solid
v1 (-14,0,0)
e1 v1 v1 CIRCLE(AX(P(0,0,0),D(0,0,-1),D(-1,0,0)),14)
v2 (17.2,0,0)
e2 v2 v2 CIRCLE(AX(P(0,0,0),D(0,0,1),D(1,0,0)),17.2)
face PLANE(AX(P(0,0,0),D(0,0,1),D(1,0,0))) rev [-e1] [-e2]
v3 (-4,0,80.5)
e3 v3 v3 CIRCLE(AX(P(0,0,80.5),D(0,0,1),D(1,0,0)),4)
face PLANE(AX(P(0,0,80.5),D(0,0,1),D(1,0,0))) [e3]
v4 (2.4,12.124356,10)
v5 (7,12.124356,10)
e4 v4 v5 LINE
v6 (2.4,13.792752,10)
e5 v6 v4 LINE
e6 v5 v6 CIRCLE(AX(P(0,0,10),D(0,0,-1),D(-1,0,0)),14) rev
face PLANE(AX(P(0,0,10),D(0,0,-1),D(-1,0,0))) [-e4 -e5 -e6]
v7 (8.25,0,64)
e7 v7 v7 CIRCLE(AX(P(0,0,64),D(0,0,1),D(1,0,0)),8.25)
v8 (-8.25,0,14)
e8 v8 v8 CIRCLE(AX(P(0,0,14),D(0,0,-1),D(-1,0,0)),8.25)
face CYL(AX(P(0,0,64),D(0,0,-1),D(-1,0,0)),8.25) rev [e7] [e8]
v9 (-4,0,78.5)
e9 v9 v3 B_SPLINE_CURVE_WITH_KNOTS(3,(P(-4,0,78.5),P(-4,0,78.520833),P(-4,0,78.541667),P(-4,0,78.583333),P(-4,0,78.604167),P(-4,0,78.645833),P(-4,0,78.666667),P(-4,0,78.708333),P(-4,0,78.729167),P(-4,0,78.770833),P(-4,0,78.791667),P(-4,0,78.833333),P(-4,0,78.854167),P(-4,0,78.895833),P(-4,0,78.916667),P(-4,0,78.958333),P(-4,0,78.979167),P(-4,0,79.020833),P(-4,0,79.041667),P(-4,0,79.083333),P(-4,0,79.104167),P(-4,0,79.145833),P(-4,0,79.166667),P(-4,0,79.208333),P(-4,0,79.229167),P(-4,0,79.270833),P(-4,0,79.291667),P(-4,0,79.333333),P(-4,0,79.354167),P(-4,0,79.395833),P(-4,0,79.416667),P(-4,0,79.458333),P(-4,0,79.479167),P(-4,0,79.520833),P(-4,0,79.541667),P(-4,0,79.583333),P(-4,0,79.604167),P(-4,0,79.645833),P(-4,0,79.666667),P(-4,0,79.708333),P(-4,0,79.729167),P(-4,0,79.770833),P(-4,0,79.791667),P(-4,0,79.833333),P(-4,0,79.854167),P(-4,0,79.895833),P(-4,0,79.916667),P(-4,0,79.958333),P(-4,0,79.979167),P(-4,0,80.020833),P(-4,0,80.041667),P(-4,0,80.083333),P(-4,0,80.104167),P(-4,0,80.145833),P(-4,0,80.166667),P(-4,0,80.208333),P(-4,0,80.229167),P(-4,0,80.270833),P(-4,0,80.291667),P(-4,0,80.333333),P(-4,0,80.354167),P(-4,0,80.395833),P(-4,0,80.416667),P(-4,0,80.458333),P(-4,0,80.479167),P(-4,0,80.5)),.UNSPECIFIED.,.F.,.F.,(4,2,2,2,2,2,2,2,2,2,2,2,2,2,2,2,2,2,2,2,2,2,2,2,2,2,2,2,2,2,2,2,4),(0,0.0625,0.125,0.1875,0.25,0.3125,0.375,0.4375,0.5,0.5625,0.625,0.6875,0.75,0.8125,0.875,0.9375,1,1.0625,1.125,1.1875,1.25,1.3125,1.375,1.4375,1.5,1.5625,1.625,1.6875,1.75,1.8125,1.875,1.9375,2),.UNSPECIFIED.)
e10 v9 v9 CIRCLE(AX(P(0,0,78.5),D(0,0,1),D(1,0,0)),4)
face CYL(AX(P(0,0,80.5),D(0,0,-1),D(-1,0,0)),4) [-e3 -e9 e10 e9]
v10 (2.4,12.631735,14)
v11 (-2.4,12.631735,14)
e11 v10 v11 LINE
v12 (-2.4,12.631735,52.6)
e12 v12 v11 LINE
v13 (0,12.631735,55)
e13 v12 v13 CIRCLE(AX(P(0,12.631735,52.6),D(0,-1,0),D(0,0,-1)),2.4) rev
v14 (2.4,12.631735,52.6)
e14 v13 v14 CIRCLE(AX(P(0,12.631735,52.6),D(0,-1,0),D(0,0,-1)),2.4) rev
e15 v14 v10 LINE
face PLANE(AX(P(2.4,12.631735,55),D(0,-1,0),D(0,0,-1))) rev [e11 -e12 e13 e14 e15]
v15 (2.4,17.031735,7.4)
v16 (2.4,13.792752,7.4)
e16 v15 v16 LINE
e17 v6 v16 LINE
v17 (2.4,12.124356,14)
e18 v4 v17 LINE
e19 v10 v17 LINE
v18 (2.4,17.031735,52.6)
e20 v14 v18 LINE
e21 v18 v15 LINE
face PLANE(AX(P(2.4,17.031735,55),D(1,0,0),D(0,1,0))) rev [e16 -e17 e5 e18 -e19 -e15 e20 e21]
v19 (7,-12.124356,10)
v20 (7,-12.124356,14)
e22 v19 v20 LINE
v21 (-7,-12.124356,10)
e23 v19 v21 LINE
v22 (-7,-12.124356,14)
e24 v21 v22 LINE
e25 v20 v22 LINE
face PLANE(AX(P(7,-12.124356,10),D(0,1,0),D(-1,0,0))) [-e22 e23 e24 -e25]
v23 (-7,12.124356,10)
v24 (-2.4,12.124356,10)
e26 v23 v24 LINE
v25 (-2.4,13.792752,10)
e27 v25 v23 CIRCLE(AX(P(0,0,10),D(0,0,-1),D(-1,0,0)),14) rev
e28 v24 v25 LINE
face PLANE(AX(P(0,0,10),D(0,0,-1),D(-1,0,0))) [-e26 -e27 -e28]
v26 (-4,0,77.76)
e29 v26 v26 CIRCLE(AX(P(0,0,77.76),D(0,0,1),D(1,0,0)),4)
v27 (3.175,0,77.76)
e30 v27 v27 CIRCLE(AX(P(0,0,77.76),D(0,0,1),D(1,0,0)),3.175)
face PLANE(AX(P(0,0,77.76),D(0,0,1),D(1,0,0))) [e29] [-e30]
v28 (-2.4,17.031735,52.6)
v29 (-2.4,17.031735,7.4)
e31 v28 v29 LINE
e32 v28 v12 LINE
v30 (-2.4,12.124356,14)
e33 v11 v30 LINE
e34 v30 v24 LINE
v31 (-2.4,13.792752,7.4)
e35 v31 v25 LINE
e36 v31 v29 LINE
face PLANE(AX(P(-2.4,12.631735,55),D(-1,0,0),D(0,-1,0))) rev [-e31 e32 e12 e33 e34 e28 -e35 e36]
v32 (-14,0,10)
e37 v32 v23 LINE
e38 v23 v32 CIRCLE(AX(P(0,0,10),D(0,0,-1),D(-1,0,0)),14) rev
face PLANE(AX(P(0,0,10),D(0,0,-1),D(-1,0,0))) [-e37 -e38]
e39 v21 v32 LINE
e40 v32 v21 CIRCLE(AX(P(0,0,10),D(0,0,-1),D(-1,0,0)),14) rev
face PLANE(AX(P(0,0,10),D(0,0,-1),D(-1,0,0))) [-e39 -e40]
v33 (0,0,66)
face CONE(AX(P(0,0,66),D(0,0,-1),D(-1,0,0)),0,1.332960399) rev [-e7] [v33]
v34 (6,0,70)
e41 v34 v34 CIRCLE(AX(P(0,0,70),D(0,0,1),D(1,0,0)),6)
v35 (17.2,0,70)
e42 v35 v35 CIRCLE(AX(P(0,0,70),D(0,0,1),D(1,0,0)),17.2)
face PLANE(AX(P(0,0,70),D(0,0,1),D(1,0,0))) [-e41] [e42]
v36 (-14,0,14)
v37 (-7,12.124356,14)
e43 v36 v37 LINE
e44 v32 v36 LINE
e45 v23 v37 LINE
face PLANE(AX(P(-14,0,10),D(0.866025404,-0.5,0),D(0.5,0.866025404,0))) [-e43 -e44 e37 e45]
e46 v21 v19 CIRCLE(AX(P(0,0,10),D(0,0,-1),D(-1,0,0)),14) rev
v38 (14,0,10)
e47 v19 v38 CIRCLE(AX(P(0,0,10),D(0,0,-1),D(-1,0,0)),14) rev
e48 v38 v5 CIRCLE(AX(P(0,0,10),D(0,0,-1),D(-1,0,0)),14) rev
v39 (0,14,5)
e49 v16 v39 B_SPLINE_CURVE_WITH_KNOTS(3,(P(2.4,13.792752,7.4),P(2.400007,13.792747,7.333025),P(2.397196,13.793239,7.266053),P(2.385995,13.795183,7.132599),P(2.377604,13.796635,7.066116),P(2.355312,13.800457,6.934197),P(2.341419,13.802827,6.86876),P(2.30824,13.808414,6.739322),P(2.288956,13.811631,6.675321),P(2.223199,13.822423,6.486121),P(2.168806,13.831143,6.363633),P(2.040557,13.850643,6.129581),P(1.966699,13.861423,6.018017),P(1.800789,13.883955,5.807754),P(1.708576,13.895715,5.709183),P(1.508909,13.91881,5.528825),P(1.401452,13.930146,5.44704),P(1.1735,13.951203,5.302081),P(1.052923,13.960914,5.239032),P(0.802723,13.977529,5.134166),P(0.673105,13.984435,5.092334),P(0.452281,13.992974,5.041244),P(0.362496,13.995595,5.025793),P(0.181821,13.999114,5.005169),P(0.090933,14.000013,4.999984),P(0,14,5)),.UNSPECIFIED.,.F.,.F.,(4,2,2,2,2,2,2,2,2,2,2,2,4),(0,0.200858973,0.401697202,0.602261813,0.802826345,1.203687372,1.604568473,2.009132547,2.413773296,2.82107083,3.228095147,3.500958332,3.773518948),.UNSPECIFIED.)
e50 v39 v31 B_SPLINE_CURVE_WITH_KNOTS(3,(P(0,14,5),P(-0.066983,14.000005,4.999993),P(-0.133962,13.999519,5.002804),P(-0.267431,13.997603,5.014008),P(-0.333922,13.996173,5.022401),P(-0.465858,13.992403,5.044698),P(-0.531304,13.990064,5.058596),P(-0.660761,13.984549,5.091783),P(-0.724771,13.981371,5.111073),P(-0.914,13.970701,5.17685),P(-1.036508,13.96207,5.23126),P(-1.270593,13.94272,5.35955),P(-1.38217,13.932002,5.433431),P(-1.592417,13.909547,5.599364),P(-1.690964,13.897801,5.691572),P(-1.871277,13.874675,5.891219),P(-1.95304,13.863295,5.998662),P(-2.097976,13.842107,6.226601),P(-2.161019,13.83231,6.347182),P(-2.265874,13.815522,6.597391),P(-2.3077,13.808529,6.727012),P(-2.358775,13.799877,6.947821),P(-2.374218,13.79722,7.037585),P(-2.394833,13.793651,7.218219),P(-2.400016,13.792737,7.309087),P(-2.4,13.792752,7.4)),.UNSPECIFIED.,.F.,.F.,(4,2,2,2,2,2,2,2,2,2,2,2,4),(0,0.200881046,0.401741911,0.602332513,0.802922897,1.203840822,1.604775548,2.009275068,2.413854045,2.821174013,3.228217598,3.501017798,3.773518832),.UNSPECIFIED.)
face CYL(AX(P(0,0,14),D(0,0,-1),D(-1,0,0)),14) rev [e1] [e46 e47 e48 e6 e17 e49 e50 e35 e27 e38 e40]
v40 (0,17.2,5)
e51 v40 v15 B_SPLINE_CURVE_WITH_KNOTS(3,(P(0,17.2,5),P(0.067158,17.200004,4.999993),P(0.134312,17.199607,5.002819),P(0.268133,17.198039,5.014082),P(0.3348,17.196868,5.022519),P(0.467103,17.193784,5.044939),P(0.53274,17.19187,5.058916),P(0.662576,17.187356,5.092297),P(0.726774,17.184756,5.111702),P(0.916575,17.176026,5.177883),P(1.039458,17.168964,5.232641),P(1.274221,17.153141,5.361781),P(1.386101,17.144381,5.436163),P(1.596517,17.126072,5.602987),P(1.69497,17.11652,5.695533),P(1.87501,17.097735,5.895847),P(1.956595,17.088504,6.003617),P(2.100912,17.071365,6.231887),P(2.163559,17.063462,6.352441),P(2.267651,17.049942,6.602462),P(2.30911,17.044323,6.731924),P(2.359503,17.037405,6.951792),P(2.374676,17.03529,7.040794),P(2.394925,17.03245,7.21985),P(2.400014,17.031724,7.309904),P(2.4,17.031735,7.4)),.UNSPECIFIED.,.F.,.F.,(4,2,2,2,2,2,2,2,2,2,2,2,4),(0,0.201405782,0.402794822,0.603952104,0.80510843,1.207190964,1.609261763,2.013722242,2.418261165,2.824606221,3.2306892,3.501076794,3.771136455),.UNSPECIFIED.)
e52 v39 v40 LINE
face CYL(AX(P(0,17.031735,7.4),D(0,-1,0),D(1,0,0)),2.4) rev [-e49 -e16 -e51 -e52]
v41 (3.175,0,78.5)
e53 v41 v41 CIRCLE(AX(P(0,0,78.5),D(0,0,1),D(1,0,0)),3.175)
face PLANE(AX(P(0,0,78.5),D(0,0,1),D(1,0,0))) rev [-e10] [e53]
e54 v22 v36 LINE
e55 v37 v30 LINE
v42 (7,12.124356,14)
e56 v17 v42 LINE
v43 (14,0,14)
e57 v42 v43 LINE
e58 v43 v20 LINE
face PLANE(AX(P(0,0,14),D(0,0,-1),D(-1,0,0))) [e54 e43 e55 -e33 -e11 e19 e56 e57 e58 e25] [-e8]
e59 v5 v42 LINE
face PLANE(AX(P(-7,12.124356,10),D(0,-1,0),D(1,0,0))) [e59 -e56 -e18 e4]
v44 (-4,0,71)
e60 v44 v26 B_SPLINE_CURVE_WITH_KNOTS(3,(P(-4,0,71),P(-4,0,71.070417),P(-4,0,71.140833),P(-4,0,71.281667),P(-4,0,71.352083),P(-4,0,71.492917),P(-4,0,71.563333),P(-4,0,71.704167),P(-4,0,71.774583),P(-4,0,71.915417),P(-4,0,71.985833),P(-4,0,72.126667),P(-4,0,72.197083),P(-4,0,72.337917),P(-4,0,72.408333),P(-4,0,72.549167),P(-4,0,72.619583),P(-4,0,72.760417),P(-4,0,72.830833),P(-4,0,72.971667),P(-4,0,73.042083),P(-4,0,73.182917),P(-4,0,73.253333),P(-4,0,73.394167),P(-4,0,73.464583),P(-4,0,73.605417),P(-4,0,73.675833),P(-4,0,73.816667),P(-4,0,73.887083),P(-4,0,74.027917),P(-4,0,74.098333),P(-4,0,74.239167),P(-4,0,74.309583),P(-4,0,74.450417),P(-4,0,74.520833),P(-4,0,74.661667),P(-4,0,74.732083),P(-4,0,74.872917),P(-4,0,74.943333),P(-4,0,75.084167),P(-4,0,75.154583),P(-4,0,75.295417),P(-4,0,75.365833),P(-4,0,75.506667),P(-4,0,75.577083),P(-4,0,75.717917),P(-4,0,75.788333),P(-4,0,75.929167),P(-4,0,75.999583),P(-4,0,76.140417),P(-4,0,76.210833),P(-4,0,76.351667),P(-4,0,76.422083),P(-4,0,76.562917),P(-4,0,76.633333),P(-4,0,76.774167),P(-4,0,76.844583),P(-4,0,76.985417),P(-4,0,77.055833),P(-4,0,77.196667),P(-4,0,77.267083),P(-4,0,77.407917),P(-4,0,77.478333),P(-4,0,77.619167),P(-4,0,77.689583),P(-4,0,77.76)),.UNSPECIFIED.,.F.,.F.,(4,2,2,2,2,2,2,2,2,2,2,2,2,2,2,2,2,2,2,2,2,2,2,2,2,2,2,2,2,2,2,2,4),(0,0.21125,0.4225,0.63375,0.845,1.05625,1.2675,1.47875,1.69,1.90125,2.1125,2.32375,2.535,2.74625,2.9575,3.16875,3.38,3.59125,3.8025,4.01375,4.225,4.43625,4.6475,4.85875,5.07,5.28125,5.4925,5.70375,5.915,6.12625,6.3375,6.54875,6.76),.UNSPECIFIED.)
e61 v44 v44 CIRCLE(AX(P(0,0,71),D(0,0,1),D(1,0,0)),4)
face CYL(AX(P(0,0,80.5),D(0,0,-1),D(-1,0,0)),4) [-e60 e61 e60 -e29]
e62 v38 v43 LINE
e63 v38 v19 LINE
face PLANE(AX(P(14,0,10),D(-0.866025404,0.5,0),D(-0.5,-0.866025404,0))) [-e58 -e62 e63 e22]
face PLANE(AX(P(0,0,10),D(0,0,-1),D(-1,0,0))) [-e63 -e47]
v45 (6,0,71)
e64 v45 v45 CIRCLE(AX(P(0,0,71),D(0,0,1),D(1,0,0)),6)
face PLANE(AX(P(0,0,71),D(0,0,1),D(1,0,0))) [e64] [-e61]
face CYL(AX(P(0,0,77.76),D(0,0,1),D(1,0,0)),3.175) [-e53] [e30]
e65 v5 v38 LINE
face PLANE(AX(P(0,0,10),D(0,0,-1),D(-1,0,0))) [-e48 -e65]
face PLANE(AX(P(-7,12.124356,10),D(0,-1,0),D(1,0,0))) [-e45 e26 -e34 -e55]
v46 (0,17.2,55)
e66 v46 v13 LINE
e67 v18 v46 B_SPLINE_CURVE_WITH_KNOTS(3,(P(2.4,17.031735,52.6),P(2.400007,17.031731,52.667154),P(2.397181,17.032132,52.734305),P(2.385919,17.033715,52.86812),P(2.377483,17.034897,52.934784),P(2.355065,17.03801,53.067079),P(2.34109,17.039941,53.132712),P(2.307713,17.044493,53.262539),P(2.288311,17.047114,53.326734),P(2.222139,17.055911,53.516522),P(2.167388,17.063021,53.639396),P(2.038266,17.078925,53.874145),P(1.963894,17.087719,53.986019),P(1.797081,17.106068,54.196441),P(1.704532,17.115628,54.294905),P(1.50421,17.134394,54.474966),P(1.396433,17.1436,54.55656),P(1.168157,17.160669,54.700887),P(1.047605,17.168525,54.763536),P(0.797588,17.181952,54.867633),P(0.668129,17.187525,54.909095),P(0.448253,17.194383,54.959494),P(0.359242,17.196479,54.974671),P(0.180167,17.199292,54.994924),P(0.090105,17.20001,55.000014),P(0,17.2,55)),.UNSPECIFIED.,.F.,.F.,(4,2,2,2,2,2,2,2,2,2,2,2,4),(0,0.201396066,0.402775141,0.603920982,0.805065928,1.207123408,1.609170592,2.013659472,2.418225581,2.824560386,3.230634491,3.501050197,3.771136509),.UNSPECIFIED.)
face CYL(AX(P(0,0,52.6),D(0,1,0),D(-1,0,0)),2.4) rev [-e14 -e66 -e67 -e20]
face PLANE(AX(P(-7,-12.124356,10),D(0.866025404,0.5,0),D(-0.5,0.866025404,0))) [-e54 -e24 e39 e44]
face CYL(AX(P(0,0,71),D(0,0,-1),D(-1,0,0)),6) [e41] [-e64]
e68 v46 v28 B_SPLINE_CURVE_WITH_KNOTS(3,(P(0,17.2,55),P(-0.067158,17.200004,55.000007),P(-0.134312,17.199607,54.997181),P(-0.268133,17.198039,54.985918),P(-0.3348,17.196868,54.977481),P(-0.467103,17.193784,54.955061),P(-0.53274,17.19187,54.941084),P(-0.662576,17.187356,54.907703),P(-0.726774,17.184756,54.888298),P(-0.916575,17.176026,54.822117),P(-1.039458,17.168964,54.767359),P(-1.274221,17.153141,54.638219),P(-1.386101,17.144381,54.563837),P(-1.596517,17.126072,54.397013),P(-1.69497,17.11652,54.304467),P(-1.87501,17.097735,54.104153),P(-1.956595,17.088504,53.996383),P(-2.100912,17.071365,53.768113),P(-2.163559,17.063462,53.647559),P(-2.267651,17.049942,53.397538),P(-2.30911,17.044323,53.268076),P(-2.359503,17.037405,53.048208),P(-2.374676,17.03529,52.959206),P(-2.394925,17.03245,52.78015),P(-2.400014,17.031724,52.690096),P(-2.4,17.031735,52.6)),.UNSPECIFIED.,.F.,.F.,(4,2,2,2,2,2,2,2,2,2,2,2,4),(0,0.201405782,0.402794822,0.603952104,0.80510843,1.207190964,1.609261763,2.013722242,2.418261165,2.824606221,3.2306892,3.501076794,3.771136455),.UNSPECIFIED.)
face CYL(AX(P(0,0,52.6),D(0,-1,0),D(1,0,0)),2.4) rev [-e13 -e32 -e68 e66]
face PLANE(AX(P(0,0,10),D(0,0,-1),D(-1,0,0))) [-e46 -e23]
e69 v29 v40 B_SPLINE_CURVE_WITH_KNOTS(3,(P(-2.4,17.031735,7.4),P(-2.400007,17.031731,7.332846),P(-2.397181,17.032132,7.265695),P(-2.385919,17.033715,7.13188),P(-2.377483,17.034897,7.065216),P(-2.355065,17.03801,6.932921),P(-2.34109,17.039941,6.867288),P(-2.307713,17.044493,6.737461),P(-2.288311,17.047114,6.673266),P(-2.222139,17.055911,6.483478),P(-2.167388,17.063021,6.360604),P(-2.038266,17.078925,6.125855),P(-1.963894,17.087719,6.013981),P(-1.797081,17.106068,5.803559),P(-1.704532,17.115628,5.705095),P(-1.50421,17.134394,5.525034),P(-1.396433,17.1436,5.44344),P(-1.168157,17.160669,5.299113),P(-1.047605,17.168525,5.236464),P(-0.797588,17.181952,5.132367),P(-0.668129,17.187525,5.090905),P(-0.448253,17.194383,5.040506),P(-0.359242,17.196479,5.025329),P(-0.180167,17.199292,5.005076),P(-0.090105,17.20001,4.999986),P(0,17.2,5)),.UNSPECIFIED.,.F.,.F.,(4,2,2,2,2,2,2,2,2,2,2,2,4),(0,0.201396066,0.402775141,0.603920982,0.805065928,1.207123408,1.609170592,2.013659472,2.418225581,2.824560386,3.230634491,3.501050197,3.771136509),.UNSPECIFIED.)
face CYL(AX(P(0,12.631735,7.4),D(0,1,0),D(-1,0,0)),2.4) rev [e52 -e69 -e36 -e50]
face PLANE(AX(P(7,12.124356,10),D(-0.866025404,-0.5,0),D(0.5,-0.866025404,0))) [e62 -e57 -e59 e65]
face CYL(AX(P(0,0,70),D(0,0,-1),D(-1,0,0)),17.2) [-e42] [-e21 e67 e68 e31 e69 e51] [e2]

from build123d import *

# Parameters (mm, degrees)
SKETCH1_R           = 17.2
BOSS_EXTRUDE1_DEPTH = 70
SKETCH2_R           = 14
CUT_EXTRUDE1_DEPTH  = 14
SKETCH3_R           = 8.25
CUT_EXTRUDE2_DEPTH  = 50
SKETCH5_R           = 4
BOSS_EXTRUDE2_DEPTH = 10.5
SKETCH9_R           = 16.379462193
BOSS_EXTRUDE4_DEPTH = 4
CUT_EXTRUDE3_START  = -5
CUT_EXTRUDE3_DEPTH  = 50
FILLET2_R           = 2.4
SKETCH7_R           = 6
BOSS_EXTRUDE3_DEPTH = 1
CUT_EXTRUDE4_START  = -2
SKETCH8_R           = 4.26334812
SKETCH8_R_2         = 3.175
CUT_EXTRUDE4_DEPTH  = 0.74
SKETCH10_W          = 4.8
SKETCH10_H          = 4
CUT_EXTRUDE5_DEPTH  = 10


with BuildPart() as part:
    # Sketch1 → Boss-Extrude1 (new body)
    with BuildSketch(Plane.XY):
        Circle(SKETCH1_R)
    extrude(amount=BOSS_EXTRUDE1_DEPTH)

    # Sketch2 → Cut-Extrude1 (cut)
    with BuildSketch(Plane(origin=(0, 0, 0), x_dir=(-1, 0, 0), z_dir=(0, 0, -1))):
        Circle(SKETCH2_R)
    extrude(amount=-CUT_EXTRUDE1_DEPTH, mode=Mode.SUBTRACT)

    # Sketch3 → Cut-Extrude2 (cut)
    with BuildSketch(Plane(origin=(0, 0, 14), x_dir=(-1, 0, 0), z_dir=(0, 0, -1))):
        Circle(SKETCH3_R)
    extrude(amount=-CUT_EXTRUDE2_DEPTH, mode=Mode.SUBTRACT)

    # Sketch4 → Cut-Revolve1 (revolve, cut)
    with BuildSketch(Plane(origin=(0, 0, 0), x_dir=(1, 0, 0), z_dir=(0, 1, 0)), mode=Mode.PRIVATE) as cut_revolve1_sk:
        Polygon((8.25, -64), (0, -66), (0, -64), align=None)
    revolve(cut_revolve1_sk.sketch.rotate(Axis((0, 0, 66), (0, 0, -1)), 180), axis=Axis((0, 0, 66), (0, 0, -1)), mode=Mode.SUBTRACT)

    # Sketch5 → Boss-Extrude2 (add)
    with BuildSketch(Plane.XY.offset(70)):
        with Locations(Location((0, 0, 0), (0, 0, 180))):
            Circle(SKETCH5_R)
    extrude(amount=BOSS_EXTRUDE2_DEPTH)

    # Sketch9 → Boss-Extrude4 (add)
    with BuildSketch(Plane(origin=(0, 0, 14), x_dir=(-1, 0, 0), z_dir=(0, 0, -1))):
        Circle(SKETCH9_R)
        Polygon((-14, 0), (-7, -12.124355653), (7, -12.124355653), (14, 0), (7, 12.124355653), (-7, 12.124355653), align=None, mode=Mode.SUBTRACT)
    extrude(amount=BOSS_EXTRUDE4_DEPTH)

    # Sketch6 → Cut-Extrude3 (cut)
    with BuildSketch(Plane(origin=(0, 0, 0), x_dir=(-1, 0, 0), z_dir=(0, 0, -1)).offset(CUT_EXTRUDE3_START)):
        with BuildLine():
            Line((-2.4, 17.031735085), (-2.4, 12.631735085))
            Line((-2.4, 12.631735085), (2.4, 12.631735085))
            Line((2.4, 12.631735085), (2.4, 17.031735085))
            ThreePointArc((2.4, 17.031735085), (0, 17.2), (-2.4, 17.031735085))
        make_face()
    extrude(amount=-CUT_EXTRUDE3_DEPTH, mode=Mode.SUBTRACT)

    # Fillet2
    fillet2_edges = [part.edges().sort_by_distance(p)[0] for p in [
        (-2.4, 14.831735085, 55),
        (2.4, 14.831735085, 55),
        (-2.4, 15.412243402, 5),
        (2.4, 15.412243402, 5),
    ]]
    fillet(fillet2_edges, radius=FILLET2_R - 0.0001)  # a hair under: the kernel refuses the full size

    # Sketch7 → Boss-Extrude3 (add)
    with BuildSketch(Plane.XY.offset(70)):
        Circle(SKETCH7_R)
    extrude(amount=BOSS_EXTRUDE3_DEPTH)

    # Sketch8 → Cut-Extrude4 (cut)
    with BuildSketch(Plane.XY.offset(80.5).offset(CUT_EXTRUDE4_START)):
        Circle(SKETCH8_R)
        Circle(SKETCH8_R_2, mode=Mode.SUBTRACT)
    extrude(amount=-CUT_EXTRUDE4_DEPTH, mode=Mode.SUBTRACT)

    # Sketch10 → Cut-Extrude5 (cut)
    with BuildSketch(Plane.XZ.offset(-12.124355653)):
        with Locations((0, 12)):
            Rectangle(SKETCH10_W, SKETCH10_H)
    extrude(amount=-CUT_EXTRUDE5_DEPTH, mode=Mode.SUBTRACT)


solid = part.part
